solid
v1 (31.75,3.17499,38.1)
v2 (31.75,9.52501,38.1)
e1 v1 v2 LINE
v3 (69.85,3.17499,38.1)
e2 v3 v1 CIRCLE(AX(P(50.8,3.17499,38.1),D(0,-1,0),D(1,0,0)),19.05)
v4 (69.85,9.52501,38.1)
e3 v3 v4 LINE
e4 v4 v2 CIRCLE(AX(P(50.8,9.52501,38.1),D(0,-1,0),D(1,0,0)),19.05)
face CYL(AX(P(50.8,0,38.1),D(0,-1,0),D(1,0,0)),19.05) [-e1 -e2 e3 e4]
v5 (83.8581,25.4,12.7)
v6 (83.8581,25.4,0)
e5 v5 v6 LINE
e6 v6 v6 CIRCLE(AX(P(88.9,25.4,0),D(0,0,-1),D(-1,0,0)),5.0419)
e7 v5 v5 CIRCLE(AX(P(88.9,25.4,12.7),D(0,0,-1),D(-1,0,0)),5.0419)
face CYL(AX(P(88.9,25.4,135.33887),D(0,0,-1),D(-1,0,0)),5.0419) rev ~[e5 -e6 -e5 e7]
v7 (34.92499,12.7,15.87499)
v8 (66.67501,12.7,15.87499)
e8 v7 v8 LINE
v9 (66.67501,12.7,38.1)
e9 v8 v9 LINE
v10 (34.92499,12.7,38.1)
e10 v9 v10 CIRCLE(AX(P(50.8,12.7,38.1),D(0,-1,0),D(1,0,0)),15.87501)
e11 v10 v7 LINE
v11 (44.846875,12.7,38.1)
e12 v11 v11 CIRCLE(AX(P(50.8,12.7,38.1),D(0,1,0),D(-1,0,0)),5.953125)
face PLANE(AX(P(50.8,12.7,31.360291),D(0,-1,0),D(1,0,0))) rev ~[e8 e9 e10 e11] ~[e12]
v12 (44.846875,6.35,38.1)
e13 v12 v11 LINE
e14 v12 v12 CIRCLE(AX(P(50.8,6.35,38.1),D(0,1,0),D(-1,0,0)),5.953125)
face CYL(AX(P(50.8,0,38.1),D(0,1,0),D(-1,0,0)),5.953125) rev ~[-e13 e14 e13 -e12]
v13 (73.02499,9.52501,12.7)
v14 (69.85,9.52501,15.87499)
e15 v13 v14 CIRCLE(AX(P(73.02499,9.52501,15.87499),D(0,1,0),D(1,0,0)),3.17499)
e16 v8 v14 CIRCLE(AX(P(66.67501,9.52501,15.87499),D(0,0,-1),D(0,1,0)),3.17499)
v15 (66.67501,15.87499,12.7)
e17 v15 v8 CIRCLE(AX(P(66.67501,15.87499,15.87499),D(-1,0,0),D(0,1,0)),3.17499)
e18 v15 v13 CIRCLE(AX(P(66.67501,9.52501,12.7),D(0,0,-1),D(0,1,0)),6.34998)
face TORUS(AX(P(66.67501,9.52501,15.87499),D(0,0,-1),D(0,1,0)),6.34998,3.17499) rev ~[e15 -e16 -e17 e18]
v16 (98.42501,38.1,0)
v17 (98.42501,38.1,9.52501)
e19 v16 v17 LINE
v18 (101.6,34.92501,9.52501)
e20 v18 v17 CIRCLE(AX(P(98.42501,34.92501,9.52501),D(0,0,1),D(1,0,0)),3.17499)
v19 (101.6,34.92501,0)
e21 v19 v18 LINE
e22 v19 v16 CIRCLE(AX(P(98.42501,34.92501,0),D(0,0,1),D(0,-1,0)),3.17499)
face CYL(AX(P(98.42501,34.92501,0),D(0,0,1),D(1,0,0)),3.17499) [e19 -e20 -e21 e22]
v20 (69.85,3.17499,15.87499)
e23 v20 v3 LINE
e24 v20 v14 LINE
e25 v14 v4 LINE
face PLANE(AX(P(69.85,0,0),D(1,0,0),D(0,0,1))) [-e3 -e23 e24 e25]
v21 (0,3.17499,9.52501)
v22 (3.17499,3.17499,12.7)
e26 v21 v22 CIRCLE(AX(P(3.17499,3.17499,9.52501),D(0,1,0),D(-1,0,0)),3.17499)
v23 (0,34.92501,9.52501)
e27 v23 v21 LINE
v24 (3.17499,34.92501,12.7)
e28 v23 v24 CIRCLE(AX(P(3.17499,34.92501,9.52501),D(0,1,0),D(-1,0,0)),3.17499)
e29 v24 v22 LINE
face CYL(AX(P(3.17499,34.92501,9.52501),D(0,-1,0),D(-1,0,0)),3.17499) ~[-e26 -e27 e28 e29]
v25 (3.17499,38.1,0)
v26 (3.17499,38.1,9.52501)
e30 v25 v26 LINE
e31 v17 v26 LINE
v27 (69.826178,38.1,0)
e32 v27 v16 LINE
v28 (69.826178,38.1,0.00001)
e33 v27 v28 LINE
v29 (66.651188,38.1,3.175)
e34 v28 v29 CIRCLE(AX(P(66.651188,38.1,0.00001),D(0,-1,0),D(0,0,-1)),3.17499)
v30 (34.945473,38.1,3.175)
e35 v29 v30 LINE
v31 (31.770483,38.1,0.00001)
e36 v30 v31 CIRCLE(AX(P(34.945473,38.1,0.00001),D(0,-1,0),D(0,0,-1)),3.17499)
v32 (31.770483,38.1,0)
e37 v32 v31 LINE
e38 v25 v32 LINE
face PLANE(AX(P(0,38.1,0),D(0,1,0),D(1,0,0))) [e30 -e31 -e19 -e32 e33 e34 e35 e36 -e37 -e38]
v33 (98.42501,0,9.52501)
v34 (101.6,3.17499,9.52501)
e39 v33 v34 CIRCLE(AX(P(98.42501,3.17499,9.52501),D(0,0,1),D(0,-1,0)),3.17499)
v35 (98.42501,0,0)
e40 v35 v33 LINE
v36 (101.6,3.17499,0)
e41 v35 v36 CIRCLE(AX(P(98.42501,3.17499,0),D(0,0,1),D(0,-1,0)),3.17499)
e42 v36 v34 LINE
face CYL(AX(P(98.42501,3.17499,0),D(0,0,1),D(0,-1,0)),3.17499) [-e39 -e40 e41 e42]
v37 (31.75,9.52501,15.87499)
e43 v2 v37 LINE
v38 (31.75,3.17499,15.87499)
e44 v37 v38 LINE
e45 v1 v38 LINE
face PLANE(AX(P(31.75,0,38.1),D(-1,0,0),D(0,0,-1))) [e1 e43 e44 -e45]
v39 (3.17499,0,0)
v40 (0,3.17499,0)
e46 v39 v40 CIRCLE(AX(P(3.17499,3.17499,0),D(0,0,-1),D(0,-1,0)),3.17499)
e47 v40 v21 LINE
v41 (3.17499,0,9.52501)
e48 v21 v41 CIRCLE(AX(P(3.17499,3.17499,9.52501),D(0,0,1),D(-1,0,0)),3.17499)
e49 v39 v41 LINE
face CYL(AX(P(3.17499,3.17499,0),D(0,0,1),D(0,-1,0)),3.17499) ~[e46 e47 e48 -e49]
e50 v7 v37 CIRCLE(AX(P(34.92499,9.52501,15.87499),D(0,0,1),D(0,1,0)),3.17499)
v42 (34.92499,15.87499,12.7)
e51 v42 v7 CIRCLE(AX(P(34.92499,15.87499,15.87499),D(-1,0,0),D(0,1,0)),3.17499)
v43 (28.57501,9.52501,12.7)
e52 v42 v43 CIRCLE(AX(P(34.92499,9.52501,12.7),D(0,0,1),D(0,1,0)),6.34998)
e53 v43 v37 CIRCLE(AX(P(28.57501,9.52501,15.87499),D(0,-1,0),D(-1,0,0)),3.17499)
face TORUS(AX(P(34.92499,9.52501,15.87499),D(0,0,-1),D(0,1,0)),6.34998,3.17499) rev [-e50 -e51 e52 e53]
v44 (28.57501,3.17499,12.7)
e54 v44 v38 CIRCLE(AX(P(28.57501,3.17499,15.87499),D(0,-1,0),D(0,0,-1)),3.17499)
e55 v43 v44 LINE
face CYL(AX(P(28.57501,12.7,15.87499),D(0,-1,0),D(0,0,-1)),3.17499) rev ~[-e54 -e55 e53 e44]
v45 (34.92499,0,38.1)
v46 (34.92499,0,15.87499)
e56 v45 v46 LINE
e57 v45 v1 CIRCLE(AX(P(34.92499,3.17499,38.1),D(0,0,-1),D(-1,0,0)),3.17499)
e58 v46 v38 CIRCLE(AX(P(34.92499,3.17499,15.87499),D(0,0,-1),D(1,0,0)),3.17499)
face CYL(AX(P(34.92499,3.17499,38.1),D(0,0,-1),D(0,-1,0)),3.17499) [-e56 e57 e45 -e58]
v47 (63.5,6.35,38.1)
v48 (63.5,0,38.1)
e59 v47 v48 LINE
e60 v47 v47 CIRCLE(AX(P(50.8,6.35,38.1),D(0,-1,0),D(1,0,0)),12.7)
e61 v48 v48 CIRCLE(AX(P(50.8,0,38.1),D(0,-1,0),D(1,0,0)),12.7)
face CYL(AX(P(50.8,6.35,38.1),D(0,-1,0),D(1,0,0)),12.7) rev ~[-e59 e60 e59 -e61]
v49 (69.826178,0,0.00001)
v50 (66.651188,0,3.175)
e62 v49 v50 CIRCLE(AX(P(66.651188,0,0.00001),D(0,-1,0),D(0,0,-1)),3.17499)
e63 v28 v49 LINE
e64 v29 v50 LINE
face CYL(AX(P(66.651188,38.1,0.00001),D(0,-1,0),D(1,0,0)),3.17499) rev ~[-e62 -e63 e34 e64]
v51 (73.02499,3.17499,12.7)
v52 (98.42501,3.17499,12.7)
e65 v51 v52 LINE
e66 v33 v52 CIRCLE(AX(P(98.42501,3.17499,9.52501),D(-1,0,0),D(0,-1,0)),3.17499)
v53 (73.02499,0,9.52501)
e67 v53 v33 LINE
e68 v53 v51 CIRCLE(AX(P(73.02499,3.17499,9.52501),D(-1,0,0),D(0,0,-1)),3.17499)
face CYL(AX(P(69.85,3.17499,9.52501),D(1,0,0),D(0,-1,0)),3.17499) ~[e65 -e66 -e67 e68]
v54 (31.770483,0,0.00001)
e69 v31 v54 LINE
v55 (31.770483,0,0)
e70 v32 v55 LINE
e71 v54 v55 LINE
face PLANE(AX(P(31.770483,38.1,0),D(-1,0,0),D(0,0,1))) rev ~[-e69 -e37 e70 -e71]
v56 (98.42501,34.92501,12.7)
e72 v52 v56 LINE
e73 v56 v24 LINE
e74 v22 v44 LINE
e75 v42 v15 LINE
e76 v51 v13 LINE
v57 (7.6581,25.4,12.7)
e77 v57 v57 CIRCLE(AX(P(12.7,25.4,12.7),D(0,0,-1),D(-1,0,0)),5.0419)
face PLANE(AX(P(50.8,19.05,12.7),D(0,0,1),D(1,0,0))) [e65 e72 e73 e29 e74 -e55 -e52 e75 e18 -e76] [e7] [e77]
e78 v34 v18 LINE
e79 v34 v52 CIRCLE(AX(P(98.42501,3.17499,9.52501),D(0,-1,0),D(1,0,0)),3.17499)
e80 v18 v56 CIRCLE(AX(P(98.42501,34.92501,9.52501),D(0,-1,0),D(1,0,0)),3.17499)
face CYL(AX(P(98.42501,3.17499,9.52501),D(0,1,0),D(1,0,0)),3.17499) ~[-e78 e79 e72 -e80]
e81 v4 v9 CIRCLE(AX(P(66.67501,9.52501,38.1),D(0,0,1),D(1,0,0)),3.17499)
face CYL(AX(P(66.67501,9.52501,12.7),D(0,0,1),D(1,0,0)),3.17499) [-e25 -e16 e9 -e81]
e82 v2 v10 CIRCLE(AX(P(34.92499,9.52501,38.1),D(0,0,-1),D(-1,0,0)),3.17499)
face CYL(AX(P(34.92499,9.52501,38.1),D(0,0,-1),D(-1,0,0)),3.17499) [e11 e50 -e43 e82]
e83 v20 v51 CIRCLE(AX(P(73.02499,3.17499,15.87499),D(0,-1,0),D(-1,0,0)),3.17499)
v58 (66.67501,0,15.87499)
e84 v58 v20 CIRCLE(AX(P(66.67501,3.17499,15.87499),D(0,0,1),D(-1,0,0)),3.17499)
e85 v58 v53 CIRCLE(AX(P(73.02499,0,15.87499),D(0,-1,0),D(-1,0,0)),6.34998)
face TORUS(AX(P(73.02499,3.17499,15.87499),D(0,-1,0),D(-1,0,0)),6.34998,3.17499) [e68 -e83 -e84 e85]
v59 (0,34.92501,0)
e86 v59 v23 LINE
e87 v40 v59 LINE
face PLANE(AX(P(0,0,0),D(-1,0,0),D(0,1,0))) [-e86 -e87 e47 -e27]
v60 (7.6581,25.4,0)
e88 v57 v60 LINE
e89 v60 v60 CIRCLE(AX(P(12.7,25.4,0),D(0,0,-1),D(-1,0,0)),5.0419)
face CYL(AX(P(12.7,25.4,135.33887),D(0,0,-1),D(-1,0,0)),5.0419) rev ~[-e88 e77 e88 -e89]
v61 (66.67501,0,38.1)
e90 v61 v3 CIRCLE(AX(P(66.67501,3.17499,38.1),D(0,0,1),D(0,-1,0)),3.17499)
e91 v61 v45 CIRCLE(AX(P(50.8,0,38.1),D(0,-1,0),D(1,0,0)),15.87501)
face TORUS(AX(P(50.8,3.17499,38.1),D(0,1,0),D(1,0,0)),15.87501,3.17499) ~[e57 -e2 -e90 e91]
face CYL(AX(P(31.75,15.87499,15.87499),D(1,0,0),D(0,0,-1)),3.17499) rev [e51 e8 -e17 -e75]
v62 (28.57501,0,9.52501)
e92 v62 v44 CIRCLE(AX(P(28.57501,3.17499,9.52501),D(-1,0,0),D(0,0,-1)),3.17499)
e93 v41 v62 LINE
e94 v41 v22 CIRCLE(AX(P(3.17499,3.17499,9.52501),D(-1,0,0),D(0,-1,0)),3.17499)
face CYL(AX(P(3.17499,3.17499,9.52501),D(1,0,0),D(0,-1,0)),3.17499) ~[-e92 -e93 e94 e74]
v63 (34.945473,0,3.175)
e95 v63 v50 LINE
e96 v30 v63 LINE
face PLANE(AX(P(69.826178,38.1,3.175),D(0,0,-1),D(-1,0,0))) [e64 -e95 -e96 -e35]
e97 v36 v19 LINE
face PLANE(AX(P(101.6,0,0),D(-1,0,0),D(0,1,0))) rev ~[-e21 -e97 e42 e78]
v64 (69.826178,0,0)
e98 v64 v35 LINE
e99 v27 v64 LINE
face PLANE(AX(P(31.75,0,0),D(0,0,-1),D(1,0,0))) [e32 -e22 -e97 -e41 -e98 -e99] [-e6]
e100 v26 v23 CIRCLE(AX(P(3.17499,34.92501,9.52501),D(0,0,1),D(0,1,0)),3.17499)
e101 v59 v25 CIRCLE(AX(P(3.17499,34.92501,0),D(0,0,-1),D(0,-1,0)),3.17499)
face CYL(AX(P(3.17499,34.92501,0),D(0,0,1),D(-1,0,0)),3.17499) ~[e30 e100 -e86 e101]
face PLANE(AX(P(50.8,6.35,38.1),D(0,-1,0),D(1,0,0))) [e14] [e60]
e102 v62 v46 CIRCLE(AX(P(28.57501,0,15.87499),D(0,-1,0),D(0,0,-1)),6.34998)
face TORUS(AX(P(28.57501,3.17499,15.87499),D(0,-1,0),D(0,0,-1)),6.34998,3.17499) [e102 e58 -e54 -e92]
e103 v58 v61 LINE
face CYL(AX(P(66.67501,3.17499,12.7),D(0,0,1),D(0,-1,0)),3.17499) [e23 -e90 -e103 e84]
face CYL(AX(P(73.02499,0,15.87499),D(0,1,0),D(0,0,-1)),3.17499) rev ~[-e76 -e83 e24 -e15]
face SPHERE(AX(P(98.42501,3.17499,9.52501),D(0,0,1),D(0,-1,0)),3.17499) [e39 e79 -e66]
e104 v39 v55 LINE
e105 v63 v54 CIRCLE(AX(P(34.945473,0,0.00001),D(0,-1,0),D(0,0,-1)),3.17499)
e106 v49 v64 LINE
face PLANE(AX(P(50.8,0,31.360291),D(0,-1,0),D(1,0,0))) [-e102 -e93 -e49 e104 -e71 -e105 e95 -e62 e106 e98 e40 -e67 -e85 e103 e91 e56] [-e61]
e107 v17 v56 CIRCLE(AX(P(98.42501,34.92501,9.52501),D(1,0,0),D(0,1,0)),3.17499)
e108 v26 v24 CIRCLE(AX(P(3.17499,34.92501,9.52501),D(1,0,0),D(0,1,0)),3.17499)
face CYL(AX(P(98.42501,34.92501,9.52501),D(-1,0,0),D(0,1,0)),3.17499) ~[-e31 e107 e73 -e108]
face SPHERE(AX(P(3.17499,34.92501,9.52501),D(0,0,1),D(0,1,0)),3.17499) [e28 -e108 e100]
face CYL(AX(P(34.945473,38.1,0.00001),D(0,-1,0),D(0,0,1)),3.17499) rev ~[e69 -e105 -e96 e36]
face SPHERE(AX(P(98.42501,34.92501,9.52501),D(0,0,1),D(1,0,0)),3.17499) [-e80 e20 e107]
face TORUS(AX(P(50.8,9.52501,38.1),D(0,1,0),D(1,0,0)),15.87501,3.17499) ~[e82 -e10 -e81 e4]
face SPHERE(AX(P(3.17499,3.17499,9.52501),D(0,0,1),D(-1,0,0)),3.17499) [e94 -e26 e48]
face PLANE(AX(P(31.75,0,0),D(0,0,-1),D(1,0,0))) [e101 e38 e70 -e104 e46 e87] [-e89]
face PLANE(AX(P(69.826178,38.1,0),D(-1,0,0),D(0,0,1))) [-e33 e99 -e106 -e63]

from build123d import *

# Parameters (mm, degrees)
F0_W           = 101.6
F0_H           = 38.1
F1_DEPTH       = 12.7
F2_W           = 38.1
F2_H           = 12.7
F3_DEPTH       = 12.7
F4_D           = 11.90625
F4_CBORE_D     = 25.4
F4_CBORE_DEPTH = 6.35
F5_W           = 38.0556955934
F5_H           = 3.175
F6_DEPTH       = 38.101
F8_D           = 10.0838
F9_R           = 3.17499
F10_R          = 3.17499


# Not quite as in the source:
# - a fillet or chamfer is up to 0.001 mm smaller than in the source, because OpenCascade refuses the exact size
# - a length typed as a fraction of an inch, garbled in the dataset ("3 / 203.2 mm" for 3/8 in), is restored


with BuildPart() as f1:
    # F0 (on Top) → F1 (new body)
    with BuildSketch(Plane.XY):
        with Locations((50.8, 19.05)):
            Rectangle(F0_W, F0_H)
    extrude(amount=F1_DEPTH)

    # F2 (on face) → F3 (join)
    with BuildSketch(Plane.XZ):
        with BuildLine():
            Line((31.75, 38.1), (31.75, 12.7))
            Line((31.75, 12.7), (69.85, 12.7))
            Line((69.85, 12.7), (69.85, 38.1))
            ThreePointArc((69.85, 38.1), (50.8, 57.15), (31.75, 38.1))
        make_face()
        with Locations((50.8, 6.35)):
            Rectangle(F2_W, F2_H)
    extrude(amount=-F3_DEPTH)

    # F4 (through all)
    with Locations(Plane.XZ):
        with Locations((50.8, 38.1)):
            CounterBoreHole(F4_D / 2, F4_CBORE_D / 2, F4_CBORE_DEPTH)

    # F5 (on face) → F6 (cut, through all)
    with BuildSketch(Plane(origin=(0, 38.1, 0), x_dir=(-1, 0, 0), z_dir=(0, 1, 0))):
        with Locations((-50.798330456, 1.5875)):
            Rectangle(F5_W, F5_H)
    extrude(amount=-F6_DEPTH, mode=Mode.SUBTRACT)

    # F8 (through all)
    with Locations(Plane.XY.offset(12.7)):
        with Locations((12.7, 25.4), (88.9, 25.4)):
            Hole(F8_D / 2)

    # F9 (radius 3.175 in the source; OpenCascade refuses exactly that, so slightly less here)
    f9_edges = [f1.edges().sort_by_distance(p)[0] for p in [
        (101.6, 38.1, 6.35),
        (0, 38.1, 6.35),
        (0, 0, 6.35),
        (101.6, 0, 6.35),
        (31.770483, 19.05, 3.175),
        (69.826178, 19.05, 3.175),
    ]]
    fillet(f9_edges, radius=F9_R)

    # F10 (radius 3.175 in the source; OpenCascade refuses exactly that, so slightly less here)
    f10_edges = [f1.edges().sort_by_distance(p)[0] for p in [
        (17.462495, 0, 12.7),
        (50.8, 38.1, 12.7),
        (0, 19.05, 12.7),
        (84.137505, 0, 12.7),
        (101.6, 19.05, 12.7),
        (69.85, 6.35, 12.7),
        (50.8, 0, 57.15),
        (50.8, 12.7, 57.15),
        (69.85, 12.7, 25.4),
        (50.8, 12.7, 12.7),
        (31.75, 6.35, 12.7),
        (31.75, 12.7, 25.4),
        (31.75, 0, 25.4),
        (69.85, 0, 25.4),
    ]]
    fillet(f10_edges, radius=F10_R)


solid = f1.part
